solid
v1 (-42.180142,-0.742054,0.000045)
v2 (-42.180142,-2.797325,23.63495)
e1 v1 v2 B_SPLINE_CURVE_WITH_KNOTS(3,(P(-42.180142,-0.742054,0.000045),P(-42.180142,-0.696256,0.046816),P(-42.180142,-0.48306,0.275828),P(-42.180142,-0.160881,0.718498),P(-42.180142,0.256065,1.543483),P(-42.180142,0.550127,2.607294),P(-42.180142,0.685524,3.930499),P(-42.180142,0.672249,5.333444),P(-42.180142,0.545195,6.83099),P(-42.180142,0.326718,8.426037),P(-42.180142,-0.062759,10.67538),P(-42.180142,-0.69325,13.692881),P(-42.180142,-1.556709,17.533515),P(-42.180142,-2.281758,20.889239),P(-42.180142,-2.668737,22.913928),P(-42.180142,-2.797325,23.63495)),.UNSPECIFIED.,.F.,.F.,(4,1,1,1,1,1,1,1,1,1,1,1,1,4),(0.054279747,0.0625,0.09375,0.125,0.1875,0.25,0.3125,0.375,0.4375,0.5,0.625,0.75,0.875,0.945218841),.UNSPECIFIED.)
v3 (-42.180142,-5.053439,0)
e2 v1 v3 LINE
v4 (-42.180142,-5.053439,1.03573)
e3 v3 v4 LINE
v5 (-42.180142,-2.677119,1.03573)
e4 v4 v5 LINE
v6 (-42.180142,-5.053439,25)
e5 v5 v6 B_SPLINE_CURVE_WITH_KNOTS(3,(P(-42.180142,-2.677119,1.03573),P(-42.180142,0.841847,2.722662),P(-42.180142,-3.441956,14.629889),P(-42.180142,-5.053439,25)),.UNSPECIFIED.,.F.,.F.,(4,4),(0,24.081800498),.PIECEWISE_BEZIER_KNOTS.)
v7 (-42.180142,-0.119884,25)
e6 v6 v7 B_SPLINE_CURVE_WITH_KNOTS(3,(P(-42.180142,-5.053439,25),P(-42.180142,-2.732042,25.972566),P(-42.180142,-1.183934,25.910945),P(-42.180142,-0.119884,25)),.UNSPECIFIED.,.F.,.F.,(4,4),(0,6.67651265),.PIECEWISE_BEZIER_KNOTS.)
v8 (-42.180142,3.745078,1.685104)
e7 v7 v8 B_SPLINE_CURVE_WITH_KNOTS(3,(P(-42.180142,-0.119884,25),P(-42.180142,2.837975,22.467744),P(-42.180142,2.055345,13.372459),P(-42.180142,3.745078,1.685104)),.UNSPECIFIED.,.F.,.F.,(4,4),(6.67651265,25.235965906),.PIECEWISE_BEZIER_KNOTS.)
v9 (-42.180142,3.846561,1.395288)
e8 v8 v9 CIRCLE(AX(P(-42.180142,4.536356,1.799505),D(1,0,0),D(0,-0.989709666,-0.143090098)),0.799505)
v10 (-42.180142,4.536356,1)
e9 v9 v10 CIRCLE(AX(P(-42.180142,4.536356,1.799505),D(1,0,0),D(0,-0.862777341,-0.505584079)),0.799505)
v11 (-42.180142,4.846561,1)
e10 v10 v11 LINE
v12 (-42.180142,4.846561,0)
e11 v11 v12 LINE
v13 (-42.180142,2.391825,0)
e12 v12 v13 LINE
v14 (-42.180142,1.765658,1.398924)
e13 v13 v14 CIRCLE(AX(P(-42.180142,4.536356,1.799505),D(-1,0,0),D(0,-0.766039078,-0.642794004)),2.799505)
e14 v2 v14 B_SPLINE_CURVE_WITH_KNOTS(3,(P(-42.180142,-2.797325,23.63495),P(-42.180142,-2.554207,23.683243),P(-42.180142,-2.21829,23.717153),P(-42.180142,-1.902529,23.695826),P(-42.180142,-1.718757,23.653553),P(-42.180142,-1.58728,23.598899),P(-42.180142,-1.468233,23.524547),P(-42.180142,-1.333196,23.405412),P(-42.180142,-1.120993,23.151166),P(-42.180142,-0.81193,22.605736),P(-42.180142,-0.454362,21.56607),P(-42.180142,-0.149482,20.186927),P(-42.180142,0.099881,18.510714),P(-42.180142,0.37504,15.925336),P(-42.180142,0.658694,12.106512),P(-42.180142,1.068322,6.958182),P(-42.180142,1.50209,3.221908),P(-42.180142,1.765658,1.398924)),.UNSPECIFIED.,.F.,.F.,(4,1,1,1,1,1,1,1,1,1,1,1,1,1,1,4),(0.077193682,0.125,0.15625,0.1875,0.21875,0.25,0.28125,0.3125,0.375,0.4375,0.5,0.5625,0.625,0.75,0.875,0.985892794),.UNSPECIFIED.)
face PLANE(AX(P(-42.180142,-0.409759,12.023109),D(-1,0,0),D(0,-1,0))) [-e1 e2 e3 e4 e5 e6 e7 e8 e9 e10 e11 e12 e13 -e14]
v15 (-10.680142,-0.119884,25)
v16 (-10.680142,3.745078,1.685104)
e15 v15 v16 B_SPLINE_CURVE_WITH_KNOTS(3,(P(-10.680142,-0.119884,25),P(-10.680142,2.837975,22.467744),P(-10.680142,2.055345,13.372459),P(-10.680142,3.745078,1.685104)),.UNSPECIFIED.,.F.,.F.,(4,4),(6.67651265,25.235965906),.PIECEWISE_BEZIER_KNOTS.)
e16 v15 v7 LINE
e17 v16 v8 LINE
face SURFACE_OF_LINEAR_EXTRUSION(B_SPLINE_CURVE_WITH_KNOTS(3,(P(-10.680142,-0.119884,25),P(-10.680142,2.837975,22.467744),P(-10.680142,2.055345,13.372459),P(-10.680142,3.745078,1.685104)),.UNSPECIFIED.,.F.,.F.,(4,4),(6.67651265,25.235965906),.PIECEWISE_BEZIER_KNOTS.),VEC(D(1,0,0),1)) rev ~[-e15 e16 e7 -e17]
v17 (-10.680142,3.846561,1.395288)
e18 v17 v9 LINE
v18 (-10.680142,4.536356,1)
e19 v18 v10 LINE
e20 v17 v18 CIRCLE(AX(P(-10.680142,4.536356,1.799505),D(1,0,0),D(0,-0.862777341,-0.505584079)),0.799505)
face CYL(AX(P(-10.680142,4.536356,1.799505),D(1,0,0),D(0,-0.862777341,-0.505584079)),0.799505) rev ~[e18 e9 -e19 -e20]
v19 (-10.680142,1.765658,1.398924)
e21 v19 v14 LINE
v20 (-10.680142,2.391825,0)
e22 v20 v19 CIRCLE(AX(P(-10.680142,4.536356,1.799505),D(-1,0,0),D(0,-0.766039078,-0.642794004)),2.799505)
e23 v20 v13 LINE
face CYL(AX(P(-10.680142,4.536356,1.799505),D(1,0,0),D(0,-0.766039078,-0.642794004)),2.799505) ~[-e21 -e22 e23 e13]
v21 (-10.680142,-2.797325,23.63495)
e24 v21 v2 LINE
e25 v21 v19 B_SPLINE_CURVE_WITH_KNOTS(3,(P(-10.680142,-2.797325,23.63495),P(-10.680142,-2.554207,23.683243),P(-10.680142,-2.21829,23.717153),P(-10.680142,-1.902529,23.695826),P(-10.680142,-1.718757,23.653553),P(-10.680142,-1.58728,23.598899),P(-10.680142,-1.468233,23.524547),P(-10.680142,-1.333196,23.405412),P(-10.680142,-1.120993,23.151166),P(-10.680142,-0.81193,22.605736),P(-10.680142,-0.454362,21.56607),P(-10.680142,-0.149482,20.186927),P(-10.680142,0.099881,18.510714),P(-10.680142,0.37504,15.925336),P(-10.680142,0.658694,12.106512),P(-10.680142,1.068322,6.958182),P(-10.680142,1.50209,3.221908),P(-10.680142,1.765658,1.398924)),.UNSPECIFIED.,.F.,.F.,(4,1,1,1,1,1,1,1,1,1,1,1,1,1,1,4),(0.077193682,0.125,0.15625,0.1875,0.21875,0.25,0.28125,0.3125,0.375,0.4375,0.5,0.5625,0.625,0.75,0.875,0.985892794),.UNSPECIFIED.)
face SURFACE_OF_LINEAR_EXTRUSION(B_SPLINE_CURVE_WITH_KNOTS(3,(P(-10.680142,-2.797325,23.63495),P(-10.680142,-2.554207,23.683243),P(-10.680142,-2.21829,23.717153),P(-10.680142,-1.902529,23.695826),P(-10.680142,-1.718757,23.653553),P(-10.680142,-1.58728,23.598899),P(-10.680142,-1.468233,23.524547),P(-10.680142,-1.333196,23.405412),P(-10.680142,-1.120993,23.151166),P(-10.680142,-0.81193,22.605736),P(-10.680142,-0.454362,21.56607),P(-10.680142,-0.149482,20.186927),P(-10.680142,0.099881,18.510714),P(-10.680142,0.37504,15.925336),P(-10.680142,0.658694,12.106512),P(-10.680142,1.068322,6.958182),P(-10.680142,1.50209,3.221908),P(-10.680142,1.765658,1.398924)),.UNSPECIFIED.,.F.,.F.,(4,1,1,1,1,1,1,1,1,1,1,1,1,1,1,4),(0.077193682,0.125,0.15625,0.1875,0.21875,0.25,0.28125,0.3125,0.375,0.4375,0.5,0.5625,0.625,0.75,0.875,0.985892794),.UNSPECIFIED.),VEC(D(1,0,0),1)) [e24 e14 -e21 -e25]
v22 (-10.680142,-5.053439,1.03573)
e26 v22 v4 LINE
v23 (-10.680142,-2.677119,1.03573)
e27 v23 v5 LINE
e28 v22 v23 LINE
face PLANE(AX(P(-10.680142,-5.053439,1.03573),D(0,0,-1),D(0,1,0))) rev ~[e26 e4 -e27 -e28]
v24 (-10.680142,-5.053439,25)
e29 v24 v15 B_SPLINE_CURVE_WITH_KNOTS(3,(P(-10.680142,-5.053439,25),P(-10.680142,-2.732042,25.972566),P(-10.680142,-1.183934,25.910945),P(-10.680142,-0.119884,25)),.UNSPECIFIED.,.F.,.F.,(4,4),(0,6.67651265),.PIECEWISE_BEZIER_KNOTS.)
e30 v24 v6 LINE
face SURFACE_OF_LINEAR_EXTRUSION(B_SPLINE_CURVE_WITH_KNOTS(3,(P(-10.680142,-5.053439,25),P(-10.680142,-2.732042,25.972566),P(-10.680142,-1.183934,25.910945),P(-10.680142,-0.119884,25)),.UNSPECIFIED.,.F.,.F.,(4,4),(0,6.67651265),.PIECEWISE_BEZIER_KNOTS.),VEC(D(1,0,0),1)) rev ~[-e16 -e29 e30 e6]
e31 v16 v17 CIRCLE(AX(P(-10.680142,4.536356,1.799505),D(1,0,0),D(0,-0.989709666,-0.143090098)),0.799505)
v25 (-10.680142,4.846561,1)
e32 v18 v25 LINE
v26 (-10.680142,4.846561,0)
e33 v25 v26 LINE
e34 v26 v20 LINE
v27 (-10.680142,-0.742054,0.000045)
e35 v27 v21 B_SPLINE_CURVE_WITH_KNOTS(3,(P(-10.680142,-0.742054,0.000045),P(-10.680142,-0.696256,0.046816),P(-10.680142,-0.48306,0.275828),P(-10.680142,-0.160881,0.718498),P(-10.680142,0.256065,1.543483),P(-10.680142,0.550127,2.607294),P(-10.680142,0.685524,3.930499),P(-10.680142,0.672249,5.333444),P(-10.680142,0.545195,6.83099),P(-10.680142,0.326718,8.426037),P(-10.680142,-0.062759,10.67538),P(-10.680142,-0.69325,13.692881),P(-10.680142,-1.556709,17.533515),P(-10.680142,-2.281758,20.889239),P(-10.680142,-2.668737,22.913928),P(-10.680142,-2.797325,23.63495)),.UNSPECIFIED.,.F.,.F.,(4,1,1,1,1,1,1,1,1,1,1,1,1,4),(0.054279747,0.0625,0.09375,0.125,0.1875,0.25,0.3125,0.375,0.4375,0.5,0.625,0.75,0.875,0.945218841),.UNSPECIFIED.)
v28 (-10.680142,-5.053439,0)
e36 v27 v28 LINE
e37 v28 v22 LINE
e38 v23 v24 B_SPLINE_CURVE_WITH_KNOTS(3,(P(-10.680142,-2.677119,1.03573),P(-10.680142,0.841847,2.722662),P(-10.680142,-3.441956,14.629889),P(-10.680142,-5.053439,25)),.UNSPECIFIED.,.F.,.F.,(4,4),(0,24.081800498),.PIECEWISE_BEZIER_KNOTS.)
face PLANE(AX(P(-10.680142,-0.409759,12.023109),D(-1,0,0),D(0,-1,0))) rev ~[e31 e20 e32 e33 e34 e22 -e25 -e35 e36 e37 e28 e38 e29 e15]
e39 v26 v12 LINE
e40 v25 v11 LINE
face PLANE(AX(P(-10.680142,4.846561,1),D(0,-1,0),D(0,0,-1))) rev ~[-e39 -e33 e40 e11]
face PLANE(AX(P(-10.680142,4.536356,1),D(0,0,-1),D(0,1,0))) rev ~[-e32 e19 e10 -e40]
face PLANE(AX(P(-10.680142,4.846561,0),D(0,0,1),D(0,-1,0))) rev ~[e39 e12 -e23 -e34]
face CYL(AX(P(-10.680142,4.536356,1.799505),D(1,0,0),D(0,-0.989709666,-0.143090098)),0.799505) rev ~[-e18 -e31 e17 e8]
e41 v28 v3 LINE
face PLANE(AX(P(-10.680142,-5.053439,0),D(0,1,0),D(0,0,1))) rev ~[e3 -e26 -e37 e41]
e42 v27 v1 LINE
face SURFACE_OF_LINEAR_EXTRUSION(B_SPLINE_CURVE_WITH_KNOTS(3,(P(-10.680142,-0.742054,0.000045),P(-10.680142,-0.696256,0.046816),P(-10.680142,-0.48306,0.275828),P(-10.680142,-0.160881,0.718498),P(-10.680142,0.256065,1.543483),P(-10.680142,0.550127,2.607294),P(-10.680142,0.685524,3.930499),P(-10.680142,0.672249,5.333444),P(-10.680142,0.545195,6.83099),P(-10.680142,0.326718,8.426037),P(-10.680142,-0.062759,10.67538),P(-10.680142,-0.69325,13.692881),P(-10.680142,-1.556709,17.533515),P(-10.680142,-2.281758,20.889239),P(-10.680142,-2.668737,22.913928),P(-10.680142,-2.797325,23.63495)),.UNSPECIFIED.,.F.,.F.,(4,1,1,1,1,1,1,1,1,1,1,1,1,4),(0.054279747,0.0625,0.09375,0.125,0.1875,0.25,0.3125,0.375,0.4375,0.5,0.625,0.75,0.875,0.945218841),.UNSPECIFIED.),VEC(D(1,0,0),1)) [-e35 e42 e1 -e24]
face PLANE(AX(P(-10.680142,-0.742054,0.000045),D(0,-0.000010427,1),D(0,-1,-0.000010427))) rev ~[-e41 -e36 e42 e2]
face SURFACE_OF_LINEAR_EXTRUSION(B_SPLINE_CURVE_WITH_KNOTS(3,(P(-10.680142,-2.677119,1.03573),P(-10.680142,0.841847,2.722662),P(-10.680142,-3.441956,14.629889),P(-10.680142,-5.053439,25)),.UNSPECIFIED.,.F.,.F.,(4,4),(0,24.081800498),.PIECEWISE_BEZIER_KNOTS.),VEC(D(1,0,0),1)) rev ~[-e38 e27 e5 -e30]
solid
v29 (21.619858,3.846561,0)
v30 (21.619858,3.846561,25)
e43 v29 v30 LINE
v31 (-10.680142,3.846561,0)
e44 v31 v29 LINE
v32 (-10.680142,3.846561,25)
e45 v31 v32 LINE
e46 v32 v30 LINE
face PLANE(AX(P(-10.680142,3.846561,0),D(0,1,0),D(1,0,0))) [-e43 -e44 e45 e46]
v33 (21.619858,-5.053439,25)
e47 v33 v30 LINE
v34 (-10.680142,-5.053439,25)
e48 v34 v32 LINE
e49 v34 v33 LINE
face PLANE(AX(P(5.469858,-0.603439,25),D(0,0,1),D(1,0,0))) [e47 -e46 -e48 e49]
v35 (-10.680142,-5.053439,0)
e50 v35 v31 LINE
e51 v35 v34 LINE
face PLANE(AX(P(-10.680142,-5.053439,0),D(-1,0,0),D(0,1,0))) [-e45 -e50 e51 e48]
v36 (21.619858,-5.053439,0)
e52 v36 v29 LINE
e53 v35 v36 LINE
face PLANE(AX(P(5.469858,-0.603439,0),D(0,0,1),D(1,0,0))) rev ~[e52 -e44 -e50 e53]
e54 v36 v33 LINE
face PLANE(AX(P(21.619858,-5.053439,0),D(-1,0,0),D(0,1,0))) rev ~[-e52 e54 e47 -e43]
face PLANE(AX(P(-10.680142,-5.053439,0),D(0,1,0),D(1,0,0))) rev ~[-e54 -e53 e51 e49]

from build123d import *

# Parameters (mm, degrees)
F0_W     = 32.3
F0_H     = 8.9
F1_DEPTH = 25
F3_DEPTH = 31.5


# Not quite as in the source:
# - ends of sketch curves that miss each other by under 0.0002 mm in the source are joined
# - the dataset's text gives a spline's control points without its knots; the knots are read off the source's solid
# - a feature names something its author has since deleted; it is built from what else it names


with BuildPart() as f1:
    # F0 (on Top) → F1 (new body)
    with BuildSketch(Plane.XY):
        with Locations((5.4698575486, -0.6034393178)):
            Rectangle(F0_W, F0_H)
    extrude(amount=F1_DEPTH)


with BuildPart() as f3:
    # F2 (on face) → F3 (new body)
    with BuildSketch(Plane(origin=(-10.6801424514, 0, 0), x_dir=(0, -1, 0), z_dir=(-1, 0, 0))):
        with BuildLine():
            Line((5.0534393178, 1.0357304234), (2.6771188714, 1.0357304234))
            add(Edge.make_bspline(
                [(2.6771188714, 1.0357304234), (-0.8418467478, 2.7226619422), (3.4419558942, 14.6298892796), (5.0534393178, 25)],
                knots=[0, 0, 0, 0, 24.0818004976, 24.0818004976, 24.0818004976, 24.0818004976], degree=3))
            Line((5.0534393178, 25), (0.119884152, 25))
            add(Edge.make_bspline(
                [(0.119884152, 25), (-2.8379753894, 22.4677441836), (-2.0553450015, 13.3724585221), (-3.745077647, 1.6851037906)],
                knots=[6.6765126495, 6.6765126495, 6.6765126495, 6.6765126495, 25.2359659061, 25.2359659061, 25.2359659061, 25.2359659061], degree=3))
            add(Edge.make_bspline(
                [(-3.745077647, 1.6851037906), (-3.7779541339, 1.4577073649), (-3.8117665587, 1.2293296854), (-3.8465606822, 1)],
                knots=[25.2359659061, 25.2359659061, 25.2359659061, 25.2359659061, 25.5970701448, 25.5970701448, 25.5970701448, 25.5970701448], degree=3))
            Line((-3.8465606822, 1), (-3.8465606822, 0))
            Line((-3.8465606822, 0), (-2.3918252697, 0))
            ThreePointArc((-2.3918252697, 0), (-1.9811428085, 0.6557758803), (-1.7656583318, 1.3989235973))
            add(Edge.make_bspline(
                [(2.7973249591, 23.6349495832), (2.5542065536, 23.6832426766), (2.2182902844, 23.7171528416), (1.9025294377, 23.6958260622), (1.7187571468, 23.6535525287), (1.5872796632, 23.5988992548), (1.4682334776, 23.5245471174), (1.3331956369, 23.4054124572), (1.1209928945, 23.151165617), (0.8119295886, 22.6057356225), (0.4543623636, 21.5660702122), (0.1494819685, 20.186926591), (-0.0998810713, 18.5107135491), (-0.3750402406, 15.9253364577), (-0.6586936544, 12.1065119049), (-1.0683221986, 6.9581823178), (-1.5020900663, 3.2219080247), (-1.7656583318, 1.3989235973)],
                knots=[0.0771936817, 0.0771936817, 0.0771936817, 0.0771936817, 0.125, 0.15625, 0.1875, 0.21875, 0.25, 0.28125, 0.3125, 0.375, 0.4375, 0.5, 0.5625, 0.625, 0.75, 0.875, 0.9858927937, 0.9858927937, 0.9858927937, 0.9858927937], degree=3))
            add(Edge.make_bspline(
                [(0.742053504, 4.49535e-05), (0.6962561573, 0.0468160151), (0.4830601411, 0.2758284647), (0.1608813084, 0.7184982614), (-0.2560654542, 1.5434831509), (-0.5501272315, 2.6072939003), (-0.6855239109, 3.9304992744), (-0.6722493573, 5.3334435146), (-0.5451945541, 6.8309904438), (-0.3267180535, 8.4260370504), (0.062759398, 10.6753803152), (0.6932496185, 13.6928806547), (1.5567086755, 17.5335150811), (2.2817575639, 20.8892385574), (2.6687374058, 22.9139279094), (2.7973249591, 23.6349495832)],
                knots=[0.0542797466, 0.0542797466, 0.0542797466, 0.0542797466, 0.0625, 0.09375, 0.125, 0.1875, 0.25, 0.3125, 0.375, 0.4375, 0.5, 0.625, 0.75, 0.875, 0.9452188411, 0.9452188411, 0.9452188411, 0.9452188411], degree=3))
            Line((0.742053504, 4.49535e-05), (5.0534393178, 0))
            Line((5.0534393178, 0), (5.0534393178, 1.0357304234))
        make_face()
        with BuildLine():
            Line((0.119884152, 25), (5.0534393178, 25))
            add(Edge.make_bspline(
                [(5.0534393178, 25), (2.732042289, 25.9725657014), (1.1839341739, 25.9109448299), (0.119884152, 25)],
                knots=[0, 0, 0, 0, 6.6765126495, 6.6765126495, 6.6765126495, 6.6765126495], degree=3))
        make_face()
        with BuildLine():
            add(Edge.make_bspline(
                [(-3.745077647, 1.6851037906), (-3.7779541339, 1.4577073649), (-3.8117665587, 1.2293296854), (-3.8465606822, 1)],
                knots=[25.2359659061, 25.2359659061, 25.2359659061, 25.2359659061, 25.5970701448, 25.5970701448, 25.5970701448, 25.5970701448], degree=3))
            ThreePointArc((-3.745077647, 1.6851037906), (-3.7817745844, 1.5352780015), (-3.8465606822, 1.3952880238))
            Line((-3.8465606822, 1.3952880238), (-3.8465606822, 1))
        make_face()
        with BuildLine():
            Line((-3.8465606822, 0), (-3.8465606822, 1))
            Line((-3.8465606822, 1), (-3.8465606822, 1.3952880238))
            ThreePointArc((-3.8465606822, 1.3952880238), (-4.1388415136, 1.105825773), (-4.5363555194, 1))
            Line((-4.5363555194, 1), (-4.8465606822, 1))
            Line((-4.8465606822, 1), (-4.8465606822, 0))
            Line((-4.8465606822, 0), (-3.8465606822, 0))
        make_face()
    extrude(amount=F3_DEPTH)


solid = Compound([f1.part, f3.part])
